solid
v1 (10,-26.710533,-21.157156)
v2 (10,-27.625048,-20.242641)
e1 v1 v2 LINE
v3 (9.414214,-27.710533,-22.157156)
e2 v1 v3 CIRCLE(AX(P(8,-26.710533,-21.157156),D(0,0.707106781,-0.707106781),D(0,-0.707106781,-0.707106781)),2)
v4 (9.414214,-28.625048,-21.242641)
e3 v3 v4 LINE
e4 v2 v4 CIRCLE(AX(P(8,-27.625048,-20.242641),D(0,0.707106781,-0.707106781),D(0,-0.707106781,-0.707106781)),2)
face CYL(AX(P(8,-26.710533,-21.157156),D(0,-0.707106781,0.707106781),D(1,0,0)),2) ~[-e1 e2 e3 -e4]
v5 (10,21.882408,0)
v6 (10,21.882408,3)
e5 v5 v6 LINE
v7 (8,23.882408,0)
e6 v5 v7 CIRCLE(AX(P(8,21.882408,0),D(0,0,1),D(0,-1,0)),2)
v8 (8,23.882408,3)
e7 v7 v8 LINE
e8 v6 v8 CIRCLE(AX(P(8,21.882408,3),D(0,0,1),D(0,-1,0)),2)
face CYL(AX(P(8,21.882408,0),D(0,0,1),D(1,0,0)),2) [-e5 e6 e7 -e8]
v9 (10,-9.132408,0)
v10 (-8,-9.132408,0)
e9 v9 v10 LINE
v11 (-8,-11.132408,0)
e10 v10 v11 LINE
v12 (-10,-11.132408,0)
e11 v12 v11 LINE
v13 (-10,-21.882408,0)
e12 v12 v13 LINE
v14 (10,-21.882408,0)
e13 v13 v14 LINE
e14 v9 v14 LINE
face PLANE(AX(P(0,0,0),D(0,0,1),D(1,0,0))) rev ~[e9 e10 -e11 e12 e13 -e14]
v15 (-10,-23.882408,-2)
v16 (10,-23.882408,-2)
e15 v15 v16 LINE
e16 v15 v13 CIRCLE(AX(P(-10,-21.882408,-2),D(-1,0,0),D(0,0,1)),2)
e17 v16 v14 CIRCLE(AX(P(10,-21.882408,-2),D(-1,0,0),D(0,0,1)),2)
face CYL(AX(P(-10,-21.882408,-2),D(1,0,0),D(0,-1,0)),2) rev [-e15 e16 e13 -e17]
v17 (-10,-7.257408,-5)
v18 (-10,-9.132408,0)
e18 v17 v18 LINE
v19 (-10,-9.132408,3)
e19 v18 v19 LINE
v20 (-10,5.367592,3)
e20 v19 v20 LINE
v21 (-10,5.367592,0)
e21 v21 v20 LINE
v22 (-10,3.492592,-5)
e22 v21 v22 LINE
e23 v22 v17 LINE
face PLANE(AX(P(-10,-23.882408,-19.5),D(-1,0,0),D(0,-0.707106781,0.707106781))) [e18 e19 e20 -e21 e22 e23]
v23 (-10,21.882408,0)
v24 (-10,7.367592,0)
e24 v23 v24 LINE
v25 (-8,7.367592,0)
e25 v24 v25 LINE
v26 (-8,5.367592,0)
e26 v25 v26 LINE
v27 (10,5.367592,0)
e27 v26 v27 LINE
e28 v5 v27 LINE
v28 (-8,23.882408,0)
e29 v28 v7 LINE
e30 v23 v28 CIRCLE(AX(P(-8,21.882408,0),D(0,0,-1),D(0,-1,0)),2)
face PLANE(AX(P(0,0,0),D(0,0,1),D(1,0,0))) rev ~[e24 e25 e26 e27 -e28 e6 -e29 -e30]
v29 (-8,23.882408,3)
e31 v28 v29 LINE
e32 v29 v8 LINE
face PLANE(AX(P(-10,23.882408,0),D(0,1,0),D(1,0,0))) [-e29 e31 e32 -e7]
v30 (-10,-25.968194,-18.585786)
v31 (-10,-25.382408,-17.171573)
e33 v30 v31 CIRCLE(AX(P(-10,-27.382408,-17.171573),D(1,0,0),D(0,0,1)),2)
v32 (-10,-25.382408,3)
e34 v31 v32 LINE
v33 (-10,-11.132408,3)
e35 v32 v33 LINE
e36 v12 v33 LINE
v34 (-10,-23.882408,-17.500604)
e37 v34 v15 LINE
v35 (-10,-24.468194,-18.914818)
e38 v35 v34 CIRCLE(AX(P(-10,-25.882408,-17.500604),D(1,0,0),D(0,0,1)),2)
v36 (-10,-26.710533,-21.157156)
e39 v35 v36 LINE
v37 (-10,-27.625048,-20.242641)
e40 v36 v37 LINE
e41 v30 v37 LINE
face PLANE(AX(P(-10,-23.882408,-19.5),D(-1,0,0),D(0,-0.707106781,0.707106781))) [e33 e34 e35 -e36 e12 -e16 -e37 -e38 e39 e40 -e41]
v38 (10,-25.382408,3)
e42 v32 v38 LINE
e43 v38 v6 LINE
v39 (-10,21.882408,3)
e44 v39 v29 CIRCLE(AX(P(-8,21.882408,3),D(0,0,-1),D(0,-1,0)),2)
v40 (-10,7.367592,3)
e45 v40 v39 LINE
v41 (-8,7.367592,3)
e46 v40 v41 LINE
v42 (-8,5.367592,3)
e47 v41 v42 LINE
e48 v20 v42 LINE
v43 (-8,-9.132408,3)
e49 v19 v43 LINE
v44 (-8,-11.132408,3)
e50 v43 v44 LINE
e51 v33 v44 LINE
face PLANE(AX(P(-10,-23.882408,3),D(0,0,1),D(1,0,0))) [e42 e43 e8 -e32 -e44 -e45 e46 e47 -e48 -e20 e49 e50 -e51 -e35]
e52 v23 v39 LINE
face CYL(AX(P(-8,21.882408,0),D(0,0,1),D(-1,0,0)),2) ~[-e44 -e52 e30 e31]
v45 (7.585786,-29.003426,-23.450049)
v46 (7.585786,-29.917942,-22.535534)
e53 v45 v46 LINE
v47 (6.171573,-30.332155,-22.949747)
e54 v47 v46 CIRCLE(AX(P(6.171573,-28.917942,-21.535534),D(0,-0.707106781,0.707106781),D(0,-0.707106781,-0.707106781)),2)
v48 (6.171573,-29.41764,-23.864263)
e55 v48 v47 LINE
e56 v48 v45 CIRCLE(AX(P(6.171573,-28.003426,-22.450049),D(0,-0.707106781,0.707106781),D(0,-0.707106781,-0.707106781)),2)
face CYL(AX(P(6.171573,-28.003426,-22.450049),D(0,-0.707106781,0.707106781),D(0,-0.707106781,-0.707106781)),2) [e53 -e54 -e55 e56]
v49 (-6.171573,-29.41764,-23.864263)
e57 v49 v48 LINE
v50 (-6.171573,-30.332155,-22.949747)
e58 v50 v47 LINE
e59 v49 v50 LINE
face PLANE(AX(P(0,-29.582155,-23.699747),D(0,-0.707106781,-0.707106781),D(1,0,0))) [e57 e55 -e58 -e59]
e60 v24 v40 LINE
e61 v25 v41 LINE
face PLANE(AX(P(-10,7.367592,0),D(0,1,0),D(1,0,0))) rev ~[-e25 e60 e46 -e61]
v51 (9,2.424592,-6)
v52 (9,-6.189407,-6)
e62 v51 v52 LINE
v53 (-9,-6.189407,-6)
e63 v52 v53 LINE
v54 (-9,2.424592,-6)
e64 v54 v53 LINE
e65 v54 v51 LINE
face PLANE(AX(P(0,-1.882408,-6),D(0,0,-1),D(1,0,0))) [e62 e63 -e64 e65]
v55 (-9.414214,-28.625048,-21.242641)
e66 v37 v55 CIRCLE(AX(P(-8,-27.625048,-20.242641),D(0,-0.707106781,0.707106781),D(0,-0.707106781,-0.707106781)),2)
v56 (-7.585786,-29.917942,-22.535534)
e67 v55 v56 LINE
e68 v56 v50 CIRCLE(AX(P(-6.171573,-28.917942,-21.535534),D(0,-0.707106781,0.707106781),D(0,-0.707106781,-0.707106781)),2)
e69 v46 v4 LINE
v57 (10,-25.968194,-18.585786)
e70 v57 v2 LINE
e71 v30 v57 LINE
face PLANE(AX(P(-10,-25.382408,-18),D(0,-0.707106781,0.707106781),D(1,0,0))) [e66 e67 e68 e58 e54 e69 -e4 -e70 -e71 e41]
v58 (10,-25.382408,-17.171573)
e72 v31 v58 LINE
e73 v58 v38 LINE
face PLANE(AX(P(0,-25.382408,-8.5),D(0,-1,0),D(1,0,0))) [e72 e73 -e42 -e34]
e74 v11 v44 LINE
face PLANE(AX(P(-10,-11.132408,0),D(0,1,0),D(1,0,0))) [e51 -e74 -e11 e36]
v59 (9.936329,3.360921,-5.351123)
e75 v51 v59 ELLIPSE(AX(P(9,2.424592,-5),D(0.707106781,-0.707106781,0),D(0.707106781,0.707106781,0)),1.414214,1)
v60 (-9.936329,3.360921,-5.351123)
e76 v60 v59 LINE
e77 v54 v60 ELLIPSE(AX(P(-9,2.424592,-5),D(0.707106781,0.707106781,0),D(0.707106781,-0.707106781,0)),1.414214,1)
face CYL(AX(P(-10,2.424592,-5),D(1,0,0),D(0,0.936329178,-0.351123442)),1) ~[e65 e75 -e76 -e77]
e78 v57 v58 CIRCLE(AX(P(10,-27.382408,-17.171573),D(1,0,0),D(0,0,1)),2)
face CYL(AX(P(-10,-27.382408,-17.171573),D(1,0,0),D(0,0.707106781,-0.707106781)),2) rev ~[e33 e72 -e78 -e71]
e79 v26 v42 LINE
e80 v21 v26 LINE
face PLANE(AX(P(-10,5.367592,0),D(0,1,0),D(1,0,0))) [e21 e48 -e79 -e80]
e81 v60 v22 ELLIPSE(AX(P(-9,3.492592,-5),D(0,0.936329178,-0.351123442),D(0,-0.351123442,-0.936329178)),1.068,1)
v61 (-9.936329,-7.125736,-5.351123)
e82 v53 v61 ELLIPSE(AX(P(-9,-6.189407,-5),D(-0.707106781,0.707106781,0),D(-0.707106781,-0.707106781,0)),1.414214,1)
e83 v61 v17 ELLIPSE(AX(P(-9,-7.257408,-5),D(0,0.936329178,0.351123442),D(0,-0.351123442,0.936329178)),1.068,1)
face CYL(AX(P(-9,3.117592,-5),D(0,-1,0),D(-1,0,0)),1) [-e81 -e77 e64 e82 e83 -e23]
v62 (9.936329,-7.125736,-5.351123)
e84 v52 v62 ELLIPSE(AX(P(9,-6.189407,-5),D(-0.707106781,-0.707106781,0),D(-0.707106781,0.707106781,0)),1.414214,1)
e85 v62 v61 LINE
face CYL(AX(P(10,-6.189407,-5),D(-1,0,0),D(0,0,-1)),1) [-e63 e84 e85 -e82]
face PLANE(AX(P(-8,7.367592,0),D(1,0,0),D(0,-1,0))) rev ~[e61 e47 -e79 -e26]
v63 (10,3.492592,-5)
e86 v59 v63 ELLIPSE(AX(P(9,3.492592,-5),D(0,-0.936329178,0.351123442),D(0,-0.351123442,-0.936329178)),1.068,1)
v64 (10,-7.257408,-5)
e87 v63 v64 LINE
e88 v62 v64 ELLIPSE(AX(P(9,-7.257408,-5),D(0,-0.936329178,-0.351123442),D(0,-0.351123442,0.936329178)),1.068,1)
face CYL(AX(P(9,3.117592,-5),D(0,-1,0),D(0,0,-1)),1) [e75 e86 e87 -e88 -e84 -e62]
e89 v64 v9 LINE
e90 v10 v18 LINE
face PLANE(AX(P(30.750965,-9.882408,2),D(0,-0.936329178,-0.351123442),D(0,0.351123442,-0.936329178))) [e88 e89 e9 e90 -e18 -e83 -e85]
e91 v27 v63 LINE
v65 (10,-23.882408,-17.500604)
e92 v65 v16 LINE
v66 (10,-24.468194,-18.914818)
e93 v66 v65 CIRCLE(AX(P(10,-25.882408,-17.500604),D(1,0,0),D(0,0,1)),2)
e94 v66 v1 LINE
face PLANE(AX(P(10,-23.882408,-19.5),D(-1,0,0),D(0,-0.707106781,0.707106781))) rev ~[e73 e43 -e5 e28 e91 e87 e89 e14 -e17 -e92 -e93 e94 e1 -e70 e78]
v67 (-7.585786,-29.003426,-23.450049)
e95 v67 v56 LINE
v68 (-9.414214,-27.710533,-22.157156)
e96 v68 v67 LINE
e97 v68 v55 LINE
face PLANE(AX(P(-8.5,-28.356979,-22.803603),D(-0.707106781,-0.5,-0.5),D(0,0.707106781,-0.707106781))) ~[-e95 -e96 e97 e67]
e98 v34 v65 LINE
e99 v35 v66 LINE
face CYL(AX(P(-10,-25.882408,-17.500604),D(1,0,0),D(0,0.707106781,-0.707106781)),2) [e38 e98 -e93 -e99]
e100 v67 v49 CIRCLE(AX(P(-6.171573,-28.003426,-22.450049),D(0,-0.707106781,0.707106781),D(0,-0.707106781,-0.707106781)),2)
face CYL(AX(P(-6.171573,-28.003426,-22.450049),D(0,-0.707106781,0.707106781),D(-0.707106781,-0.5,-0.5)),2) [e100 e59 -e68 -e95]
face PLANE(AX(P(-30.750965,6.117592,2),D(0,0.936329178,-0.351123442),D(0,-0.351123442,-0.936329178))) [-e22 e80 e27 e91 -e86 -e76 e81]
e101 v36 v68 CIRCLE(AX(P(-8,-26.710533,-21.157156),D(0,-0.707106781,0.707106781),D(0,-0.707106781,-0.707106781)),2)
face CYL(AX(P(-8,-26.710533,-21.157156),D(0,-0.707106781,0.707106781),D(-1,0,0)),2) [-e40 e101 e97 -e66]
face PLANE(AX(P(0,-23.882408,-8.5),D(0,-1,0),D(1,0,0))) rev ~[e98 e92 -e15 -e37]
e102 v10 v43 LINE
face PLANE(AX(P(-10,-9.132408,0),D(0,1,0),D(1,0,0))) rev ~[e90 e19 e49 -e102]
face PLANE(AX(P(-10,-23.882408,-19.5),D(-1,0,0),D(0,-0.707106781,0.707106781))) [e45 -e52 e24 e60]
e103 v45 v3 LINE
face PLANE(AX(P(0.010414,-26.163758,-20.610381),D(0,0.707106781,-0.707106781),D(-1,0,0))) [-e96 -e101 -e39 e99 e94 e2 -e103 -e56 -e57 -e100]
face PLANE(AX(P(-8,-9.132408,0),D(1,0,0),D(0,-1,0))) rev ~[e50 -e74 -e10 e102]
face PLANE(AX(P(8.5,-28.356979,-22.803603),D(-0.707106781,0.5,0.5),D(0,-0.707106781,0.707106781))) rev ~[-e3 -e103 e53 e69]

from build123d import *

# Parameters (mm, degrees)
F0_W         = 20
F0_H         = 47.7648153901
F1_DEPTH     = 3
F3_W         = 20
F3_H         = 23
F4_DEPTH     = 1.5
F5_T1_DEPTH  = 30.2867319519
F6_W         = 20
F6_H         = 2.1213203436
F7_DEPTH     = 7
F8_W         = 23.5785972327
F8_H         = 18.0557984859
F9_DEPTH     = 0.828
F10_SIZE     = 3
F11_R        = 2
F12_W        = 20
F12_H        = 16
F13_DEPTH    = 6
F14_T4_DEPTH = 61.5019292892
F14_T9_DEPTH = 61.5019292892
F15_R        = 2
F16_R        = 1
F17_W        = 2
F17_H        = 2
F18_DEPTH    = 3


# Not quite as in the source:
# - a fillet or chamfer that OpenCascade refuses, or shapes differently, is made with other operations: its cross-section is extruded or revolved along the edge and cut away or added


with BuildPart() as f1:
    # F0 (on Top) → F1 (new body)
    with BuildSketch(Plane.XY):
        Rectangle(F0_W, F0_H)
    extrude(amount=F1_DEPTH)

    # F3 (on offset) → F4 (join)
    with BuildSketch(Plane.XZ.offset(23.8824076951)):
        with Locations((0, -8.5)):
            Rectangle(F3_W, F3_H)
    extrude(amount=F4_DEPTH)

    # F5: chamfer of 2 on 1 edges, made by hand

    # F5_s2 → F5_t1 (cut)
    with BuildSketch(Plane.YZ.offset(-15.1433659759)):
        Polygon((-25.3824076951, -18), (-23.3824076951, -20), (-25.3824076951, -20), align=None)
    extrude(amount=F5_T1_DEPTH, mode=Mode.SUBTRACT)

    # F6 (on face) → F7 (join)
    with BuildSketch(Plane(origin=(0, -21.6912038475, -21.6912038475), x_dir=(1, 0, 0), z_dir=(0, -0.7071067812, -0.7071067812))):
        with Locations((0, 4.1594903709)):
            Rectangle(F6_W, F6_H)
    extrude(amount=F7_DEPTH)

    # F8 (on face) → F9 (cut)
    with BuildSketch(Plane(origin=(0, -2.1912038475, 2.1912038475), x_dir=(-1, 0, 0), z_dir=(0, 0.7071067812, -0.7071067812))):
        with Locations((-0.010414049, -33.0743109807)):
            Rectangle(F8_W, F8_H)
    extrude(amount=-F9_DEPTH, mode=Mode.SUBTRACT)

    # F10
    f10_edges = [f1.edges().sort_by_distance(p)[0] for p in [
        (-10, -29.874897, -23.407005),
        (10, -29.874897, -23.407005),
    ]]
    chamfer(f10_edges, length=F10_SIZE)

    # F11
    f11_edges = [f1.edges().sort_by_distance(p)[0] for p in [
        (0, -23.882408, 0),
        (0, -25.382408, -18),
        (0, -23.882408, -18.329031),
        (-10, -27.753577, -21.285685),
        (-7, -29.874897, -23.407005),
        (7, -29.874897, -23.407005),
        (10, -27.753577, -21.285685),
    ]]
    fillet(f11_edges, radius=F11_R)

    # F12 (on face) → F13 (join)
    with BuildSketch(Plane(origin=(0, 0, 0), x_dir=(1, 0, 0), z_dir=(0, 0, -1))):
        with Locations((0, 1.8824076951)):
            Rectangle(F12_W, F12_H)
    extrude(amount=F13_DEPTH)

    # F14: chamfer of 3 x 8 on 2 edges, made by hand


with BuildPart() as f14_tool2:
    # F14_s3 → F14_t4 (new body)
    with BuildSketch(Plane.YZ.offset(30.7509646446)):
        Polygon((-9.8824076951, 2), (-6.8824076951, -6), (-9.8824076951, -6), align=None)
    extrude(amount=-F14_T4_DEPTH)

    split(bisect_by=Plane.XY, keep=Keep.BOTTOM)


with BuildPart() as f1_1:
    add(f1.part)

    # F14_t1: cut F14_tool2
    add(f14_tool2.part, mode=Mode.SUBTRACT)


with BuildPart() as f14_tool7:
    # F14_s8 → F14_t9 (new body)
    with BuildSketch(Plane.YZ.offset(-30.7509646446)):
        Polygon((6.1175923049, 2), (3.1175923049, -6), (6.1175923049, -6), align=None)
    extrude(amount=F14_T9_DEPTH)

    split(bisect_by=Plane.XY, keep=Keep.BOTTOM)


with BuildPart() as f1_2:
    add(f1_1.part)

    # F14_t6: cut F14_tool7
    add(f14_tool7.part, mode=Mode.SUBTRACT)

    # F15
    f15_edges = [f1_2.edges().sort_by_distance(p)[0] for p in [
        (-10, 23.882408, 1.5),
        (10, 23.882408, 1.5),
    ]]
    fillet(f15_edges, radius=F15_R)

    # F16
    f16_edges = [f1_2.edges().sort_by_distance(p)[0] for p in [
        (-10, -1.882408, -6),
        (0, -6.882408, -6),
        (10, -1.882408, -6),
        (0, 3.117592, -6),
    ]]
    fillet(f16_edges, radius=F16_R)

    # F17 (on face) → F18 (cut, through all)
    with BuildSketch(Plane(origin=(0, 0, 0), x_dir=(1, 0, 0), z_dir=(0, 0, -1))):
        with Locations((-9, -6.3675923049)):
            Rectangle(F17_W, F17_H)
        with Locations((-9, 10.1324076951)):
            Rectangle(F17_W, F17_H)
    extrude(amount=-F18_DEPTH, mode=Mode.SUBTRACT)


solid = f1_2.part
